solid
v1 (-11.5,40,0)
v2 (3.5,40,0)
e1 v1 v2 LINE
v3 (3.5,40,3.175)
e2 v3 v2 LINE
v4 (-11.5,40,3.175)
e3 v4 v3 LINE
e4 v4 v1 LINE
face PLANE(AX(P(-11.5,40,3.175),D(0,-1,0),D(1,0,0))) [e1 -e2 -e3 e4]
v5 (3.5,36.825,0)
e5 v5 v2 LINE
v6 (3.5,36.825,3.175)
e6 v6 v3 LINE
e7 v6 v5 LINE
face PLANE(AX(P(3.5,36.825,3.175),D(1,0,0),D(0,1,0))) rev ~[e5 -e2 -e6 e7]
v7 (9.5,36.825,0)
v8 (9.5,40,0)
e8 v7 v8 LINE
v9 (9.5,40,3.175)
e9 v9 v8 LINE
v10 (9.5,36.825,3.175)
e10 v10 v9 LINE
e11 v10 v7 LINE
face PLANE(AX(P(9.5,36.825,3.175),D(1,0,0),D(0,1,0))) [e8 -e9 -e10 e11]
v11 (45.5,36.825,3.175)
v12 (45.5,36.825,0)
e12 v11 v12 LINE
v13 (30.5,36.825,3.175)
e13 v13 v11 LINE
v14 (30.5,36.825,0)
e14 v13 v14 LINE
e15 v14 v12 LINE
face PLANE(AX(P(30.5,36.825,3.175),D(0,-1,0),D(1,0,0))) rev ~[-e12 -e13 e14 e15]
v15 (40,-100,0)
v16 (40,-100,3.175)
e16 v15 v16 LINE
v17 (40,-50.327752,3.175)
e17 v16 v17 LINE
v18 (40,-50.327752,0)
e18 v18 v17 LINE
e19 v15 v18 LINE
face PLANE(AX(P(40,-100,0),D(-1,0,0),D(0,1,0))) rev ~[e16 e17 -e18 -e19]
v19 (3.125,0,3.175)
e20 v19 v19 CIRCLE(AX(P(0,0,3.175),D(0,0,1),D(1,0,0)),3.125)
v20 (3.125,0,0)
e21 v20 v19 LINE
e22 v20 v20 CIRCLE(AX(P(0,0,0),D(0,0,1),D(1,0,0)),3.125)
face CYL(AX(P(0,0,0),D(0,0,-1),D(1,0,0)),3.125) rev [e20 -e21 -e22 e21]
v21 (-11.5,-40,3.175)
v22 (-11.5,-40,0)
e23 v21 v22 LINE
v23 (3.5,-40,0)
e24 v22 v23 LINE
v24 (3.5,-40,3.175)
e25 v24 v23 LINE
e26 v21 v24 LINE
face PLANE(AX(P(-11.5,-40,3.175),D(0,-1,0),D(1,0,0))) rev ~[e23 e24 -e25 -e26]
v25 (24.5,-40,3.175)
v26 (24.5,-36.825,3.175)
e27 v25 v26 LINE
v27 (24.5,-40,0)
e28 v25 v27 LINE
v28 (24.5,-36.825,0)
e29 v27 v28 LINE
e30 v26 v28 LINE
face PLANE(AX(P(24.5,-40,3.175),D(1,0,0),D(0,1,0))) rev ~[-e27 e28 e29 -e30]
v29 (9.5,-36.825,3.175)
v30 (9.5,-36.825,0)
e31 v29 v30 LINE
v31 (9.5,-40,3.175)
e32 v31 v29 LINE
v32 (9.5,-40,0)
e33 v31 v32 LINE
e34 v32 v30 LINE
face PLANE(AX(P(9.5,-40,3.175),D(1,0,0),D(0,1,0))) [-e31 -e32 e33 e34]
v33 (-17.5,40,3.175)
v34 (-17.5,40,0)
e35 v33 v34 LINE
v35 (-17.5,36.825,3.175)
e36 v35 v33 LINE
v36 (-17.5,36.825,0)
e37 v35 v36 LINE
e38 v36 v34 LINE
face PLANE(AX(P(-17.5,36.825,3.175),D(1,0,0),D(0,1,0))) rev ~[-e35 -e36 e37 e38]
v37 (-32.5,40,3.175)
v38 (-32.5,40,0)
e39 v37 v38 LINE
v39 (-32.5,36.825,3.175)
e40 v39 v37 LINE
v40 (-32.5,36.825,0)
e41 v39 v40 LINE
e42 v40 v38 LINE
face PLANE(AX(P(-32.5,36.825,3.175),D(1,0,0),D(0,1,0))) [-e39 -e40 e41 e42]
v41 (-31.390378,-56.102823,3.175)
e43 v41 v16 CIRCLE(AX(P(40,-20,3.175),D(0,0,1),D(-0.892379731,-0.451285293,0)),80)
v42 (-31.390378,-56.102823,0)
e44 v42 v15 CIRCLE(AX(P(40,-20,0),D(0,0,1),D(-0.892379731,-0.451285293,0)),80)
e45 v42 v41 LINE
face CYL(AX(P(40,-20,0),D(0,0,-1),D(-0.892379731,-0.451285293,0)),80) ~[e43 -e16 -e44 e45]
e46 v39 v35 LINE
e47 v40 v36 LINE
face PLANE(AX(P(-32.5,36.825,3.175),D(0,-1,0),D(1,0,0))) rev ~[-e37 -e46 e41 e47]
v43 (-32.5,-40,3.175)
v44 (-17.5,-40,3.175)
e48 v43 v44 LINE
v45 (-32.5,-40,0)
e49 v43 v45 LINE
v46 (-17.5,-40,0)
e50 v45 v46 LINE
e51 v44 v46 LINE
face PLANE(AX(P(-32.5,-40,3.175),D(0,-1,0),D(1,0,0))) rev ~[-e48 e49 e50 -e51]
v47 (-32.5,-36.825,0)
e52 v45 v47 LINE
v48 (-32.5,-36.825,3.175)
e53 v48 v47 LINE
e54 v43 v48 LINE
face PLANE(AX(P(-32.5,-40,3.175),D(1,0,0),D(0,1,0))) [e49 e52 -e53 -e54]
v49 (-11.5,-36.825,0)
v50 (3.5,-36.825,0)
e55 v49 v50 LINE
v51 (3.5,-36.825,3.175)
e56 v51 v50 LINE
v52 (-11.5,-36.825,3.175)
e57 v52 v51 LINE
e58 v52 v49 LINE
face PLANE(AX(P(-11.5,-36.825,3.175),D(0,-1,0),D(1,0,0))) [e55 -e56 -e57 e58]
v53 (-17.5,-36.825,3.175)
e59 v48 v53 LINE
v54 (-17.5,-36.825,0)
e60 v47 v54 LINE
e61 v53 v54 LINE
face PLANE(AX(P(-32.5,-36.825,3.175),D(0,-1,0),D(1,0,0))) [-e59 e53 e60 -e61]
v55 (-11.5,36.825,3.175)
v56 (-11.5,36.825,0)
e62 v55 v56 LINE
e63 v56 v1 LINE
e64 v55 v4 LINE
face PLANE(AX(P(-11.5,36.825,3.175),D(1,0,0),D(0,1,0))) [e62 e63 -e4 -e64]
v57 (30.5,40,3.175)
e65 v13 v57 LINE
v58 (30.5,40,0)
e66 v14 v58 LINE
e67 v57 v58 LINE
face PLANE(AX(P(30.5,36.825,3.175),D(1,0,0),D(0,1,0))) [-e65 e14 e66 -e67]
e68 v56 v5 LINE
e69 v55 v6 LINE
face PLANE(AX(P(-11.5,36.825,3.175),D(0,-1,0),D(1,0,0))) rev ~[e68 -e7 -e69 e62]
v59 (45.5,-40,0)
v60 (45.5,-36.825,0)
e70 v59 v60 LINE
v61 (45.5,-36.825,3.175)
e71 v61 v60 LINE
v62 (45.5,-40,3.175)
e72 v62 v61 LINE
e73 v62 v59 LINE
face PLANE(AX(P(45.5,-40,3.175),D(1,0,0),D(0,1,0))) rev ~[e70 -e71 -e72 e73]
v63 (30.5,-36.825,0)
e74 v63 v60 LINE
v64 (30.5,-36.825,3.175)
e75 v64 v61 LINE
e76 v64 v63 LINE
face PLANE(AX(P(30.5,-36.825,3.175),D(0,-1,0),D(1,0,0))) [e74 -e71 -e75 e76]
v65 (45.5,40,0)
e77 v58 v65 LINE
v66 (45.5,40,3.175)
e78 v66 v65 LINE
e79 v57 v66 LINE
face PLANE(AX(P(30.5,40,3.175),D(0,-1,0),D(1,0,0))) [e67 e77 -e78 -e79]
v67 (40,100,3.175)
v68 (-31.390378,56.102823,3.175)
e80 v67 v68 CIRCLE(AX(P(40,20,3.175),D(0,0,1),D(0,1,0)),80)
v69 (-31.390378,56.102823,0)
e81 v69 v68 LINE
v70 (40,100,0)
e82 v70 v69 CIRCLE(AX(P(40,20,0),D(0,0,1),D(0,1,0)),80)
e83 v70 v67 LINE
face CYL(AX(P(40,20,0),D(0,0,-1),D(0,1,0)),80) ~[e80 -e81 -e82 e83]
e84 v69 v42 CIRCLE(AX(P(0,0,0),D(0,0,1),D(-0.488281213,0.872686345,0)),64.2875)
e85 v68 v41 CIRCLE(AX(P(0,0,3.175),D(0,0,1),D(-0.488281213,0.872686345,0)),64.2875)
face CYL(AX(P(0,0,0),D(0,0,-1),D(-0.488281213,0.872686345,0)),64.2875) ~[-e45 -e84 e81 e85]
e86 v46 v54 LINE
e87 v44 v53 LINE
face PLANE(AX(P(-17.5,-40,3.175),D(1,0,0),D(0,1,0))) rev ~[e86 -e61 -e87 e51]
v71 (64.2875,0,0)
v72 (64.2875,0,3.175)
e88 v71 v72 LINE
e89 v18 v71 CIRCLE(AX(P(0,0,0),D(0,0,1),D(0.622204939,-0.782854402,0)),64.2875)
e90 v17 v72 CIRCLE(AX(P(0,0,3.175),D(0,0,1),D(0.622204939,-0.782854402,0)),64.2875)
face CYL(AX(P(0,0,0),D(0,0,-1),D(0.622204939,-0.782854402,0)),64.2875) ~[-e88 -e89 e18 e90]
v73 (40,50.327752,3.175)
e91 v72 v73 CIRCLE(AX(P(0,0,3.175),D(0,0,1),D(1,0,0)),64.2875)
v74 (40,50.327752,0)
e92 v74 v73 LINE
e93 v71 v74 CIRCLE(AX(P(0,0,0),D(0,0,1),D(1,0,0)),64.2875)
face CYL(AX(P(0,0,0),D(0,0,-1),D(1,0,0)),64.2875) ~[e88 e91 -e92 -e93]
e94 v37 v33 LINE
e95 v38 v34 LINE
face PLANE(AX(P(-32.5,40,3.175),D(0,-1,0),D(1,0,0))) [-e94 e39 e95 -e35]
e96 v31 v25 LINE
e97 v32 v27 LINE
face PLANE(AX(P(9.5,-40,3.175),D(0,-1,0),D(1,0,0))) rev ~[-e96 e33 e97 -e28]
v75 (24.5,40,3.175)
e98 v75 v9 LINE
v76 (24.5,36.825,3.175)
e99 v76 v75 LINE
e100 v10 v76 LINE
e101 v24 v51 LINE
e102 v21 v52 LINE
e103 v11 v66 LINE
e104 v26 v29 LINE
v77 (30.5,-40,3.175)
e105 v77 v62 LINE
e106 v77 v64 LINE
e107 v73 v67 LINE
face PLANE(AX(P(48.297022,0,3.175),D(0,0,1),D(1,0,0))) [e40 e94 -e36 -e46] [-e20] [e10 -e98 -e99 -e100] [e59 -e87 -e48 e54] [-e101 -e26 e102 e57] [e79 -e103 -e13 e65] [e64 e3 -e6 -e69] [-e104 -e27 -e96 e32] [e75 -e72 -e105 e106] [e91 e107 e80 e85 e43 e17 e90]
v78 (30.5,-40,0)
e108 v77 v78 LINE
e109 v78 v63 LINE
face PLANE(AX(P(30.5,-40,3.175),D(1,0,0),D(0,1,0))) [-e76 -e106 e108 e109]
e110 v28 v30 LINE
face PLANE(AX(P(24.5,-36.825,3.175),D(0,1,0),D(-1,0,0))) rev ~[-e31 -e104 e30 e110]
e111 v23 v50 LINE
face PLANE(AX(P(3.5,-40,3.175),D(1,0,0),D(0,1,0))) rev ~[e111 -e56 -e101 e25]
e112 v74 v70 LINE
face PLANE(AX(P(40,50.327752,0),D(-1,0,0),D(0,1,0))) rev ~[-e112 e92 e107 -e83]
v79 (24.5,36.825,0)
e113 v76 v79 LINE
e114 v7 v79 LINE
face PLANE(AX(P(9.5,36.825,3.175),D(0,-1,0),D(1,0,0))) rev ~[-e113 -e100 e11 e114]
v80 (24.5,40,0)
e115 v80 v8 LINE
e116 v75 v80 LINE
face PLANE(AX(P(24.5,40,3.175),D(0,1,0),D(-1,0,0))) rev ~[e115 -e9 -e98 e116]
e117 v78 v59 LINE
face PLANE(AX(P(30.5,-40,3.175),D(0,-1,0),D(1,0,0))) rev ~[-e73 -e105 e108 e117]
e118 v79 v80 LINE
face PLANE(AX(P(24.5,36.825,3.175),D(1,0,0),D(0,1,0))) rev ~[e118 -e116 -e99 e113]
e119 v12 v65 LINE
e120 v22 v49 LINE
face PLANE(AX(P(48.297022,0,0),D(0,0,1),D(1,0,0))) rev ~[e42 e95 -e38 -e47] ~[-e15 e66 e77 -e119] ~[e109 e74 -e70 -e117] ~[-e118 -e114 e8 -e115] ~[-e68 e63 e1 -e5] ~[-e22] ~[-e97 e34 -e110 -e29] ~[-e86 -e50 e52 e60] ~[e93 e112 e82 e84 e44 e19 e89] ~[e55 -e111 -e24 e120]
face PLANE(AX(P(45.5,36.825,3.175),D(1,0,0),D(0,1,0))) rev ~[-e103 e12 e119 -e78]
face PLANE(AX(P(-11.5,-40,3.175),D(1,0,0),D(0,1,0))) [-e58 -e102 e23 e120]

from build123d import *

# Parameters (mm, degrees)
F0_R     = 3.125
F1_DEPTH = 3.175
F2_W     = 15
F2_H     = 3.175
F2_W_2   = 7.5
F3_DEPTH = 25


# Not quite as in the source:
# - a feature names something its author has since deleted; it is built from what else it names


with BuildPart() as f1:
    # F0 (on Top) → F1 (new body)
    with BuildSketch(Plane.XY):
        with BuildLine():
            ThreePointArc((40, -50.3277523465), (57.898111611, -27.9408541051), (64.2875, 0))
            ThreePointArc((64.2875, 0), (57.898111611, 27.9408541051), (40, 50.3277523465))
            Line((40, 50.3277523465), (40, -50.3277523465))
        make_face()
        with BuildLine():
            Line((40, -50.3277523465), (40, 50.3277523465))
            ThreePointArc((40, 50.3277523465), (5.1835564074, 64.0781819282), (-31.390378499, 56.1028234043))
            ThreePointArc((-31.390378499, 56.1028234043), (-37.8178330459, 38.5576092221), (-40, 20))
            Line((-40, 20), (-40, -20))
            ThreePointArc((-40, -20), (-37.8178330459, -38.5576092221), (-31.390378499, -56.1028234043))
            ThreePointArc((-31.390378499, -56.1028234043), (5.1835564074, -64.0781819282), (40, -50.3277523465))
        make_face()
        Circle(F0_R, mode=Mode.SUBTRACT)
        with BuildLine():
            ThreePointArc((-31.390378499, 56.1028234043), (5.1835564074, 64.0781819282), (40, 50.3277523465))
            Line((40, 50.3277523465), (40, 100))
            ThreePointArc((40, 100), (-1.9033061205, 88.1477287675), (-31.390378499, 56.1028234043))
        make_face()
        with BuildLine():
            Line((40, -100), (40, -50.3277523465))
            ThreePointArc((40, -50.3277523465), (5.1835564074, -64.0781819282), (-31.390378499, -56.1028234043))
            ThreePointArc((-31.390378499, -56.1028234043), (-1.9033061205, -88.1477287675), (40, -100))
        make_face()
        with BuildLine():
            ThreePointArc((-40, 20), (-37.8178330459, 38.5576092221), (-31.390378499, 56.1028234043))
            ThreePointArc((-31.390378499, 56.1028234043), (-64.2875, 0), (-31.390378499, -56.1028234043))
            ThreePointArc((-31.390378499, -56.1028234043), (-37.8178330459, -38.5576092221), (-40, -20))
            Line((-40, -20), (-40, 20))
        make_face()
    extrude(amount=F1_DEPTH)

    # F2 (on face) → F3 (cut)
    with BuildSketch(Plane.XY.offset(3.175)):
        with Locations((-4, 38.4125)):
            Rectangle(F2_W, F2_H)
        with Locations((13.25, 38.4125)):
            Rectangle(F2_W_2, F2_H)
        with Locations((20.75, 38.4125)):
            Rectangle(F2_W_2, F2_H)
        with Locations((38, 38.4125)):
            Rectangle(F2_W, F2_H)
        with Locations((-4, -38.4125)):
            Rectangle(F2_W, F2_H)
        with Locations((20.75, -38.4125)):
            Rectangle(F2_W_2, F2_H)
        with Locations((38, -38.4125)):
            Rectangle(F2_W, F2_H)
        with Locations((13.25, -38.4125)):
            Rectangle(F2_W_2, F2_H)
        with Locations((-25, -38.4125)):
            Rectangle(F2_W, F2_H)
        with Locations((-25, 38.4125)):
            Rectangle(F2_W, F2_H)
    extrude(amount=-F3_DEPTH, mode=Mode.SUBTRACT)


solid = f1.part
